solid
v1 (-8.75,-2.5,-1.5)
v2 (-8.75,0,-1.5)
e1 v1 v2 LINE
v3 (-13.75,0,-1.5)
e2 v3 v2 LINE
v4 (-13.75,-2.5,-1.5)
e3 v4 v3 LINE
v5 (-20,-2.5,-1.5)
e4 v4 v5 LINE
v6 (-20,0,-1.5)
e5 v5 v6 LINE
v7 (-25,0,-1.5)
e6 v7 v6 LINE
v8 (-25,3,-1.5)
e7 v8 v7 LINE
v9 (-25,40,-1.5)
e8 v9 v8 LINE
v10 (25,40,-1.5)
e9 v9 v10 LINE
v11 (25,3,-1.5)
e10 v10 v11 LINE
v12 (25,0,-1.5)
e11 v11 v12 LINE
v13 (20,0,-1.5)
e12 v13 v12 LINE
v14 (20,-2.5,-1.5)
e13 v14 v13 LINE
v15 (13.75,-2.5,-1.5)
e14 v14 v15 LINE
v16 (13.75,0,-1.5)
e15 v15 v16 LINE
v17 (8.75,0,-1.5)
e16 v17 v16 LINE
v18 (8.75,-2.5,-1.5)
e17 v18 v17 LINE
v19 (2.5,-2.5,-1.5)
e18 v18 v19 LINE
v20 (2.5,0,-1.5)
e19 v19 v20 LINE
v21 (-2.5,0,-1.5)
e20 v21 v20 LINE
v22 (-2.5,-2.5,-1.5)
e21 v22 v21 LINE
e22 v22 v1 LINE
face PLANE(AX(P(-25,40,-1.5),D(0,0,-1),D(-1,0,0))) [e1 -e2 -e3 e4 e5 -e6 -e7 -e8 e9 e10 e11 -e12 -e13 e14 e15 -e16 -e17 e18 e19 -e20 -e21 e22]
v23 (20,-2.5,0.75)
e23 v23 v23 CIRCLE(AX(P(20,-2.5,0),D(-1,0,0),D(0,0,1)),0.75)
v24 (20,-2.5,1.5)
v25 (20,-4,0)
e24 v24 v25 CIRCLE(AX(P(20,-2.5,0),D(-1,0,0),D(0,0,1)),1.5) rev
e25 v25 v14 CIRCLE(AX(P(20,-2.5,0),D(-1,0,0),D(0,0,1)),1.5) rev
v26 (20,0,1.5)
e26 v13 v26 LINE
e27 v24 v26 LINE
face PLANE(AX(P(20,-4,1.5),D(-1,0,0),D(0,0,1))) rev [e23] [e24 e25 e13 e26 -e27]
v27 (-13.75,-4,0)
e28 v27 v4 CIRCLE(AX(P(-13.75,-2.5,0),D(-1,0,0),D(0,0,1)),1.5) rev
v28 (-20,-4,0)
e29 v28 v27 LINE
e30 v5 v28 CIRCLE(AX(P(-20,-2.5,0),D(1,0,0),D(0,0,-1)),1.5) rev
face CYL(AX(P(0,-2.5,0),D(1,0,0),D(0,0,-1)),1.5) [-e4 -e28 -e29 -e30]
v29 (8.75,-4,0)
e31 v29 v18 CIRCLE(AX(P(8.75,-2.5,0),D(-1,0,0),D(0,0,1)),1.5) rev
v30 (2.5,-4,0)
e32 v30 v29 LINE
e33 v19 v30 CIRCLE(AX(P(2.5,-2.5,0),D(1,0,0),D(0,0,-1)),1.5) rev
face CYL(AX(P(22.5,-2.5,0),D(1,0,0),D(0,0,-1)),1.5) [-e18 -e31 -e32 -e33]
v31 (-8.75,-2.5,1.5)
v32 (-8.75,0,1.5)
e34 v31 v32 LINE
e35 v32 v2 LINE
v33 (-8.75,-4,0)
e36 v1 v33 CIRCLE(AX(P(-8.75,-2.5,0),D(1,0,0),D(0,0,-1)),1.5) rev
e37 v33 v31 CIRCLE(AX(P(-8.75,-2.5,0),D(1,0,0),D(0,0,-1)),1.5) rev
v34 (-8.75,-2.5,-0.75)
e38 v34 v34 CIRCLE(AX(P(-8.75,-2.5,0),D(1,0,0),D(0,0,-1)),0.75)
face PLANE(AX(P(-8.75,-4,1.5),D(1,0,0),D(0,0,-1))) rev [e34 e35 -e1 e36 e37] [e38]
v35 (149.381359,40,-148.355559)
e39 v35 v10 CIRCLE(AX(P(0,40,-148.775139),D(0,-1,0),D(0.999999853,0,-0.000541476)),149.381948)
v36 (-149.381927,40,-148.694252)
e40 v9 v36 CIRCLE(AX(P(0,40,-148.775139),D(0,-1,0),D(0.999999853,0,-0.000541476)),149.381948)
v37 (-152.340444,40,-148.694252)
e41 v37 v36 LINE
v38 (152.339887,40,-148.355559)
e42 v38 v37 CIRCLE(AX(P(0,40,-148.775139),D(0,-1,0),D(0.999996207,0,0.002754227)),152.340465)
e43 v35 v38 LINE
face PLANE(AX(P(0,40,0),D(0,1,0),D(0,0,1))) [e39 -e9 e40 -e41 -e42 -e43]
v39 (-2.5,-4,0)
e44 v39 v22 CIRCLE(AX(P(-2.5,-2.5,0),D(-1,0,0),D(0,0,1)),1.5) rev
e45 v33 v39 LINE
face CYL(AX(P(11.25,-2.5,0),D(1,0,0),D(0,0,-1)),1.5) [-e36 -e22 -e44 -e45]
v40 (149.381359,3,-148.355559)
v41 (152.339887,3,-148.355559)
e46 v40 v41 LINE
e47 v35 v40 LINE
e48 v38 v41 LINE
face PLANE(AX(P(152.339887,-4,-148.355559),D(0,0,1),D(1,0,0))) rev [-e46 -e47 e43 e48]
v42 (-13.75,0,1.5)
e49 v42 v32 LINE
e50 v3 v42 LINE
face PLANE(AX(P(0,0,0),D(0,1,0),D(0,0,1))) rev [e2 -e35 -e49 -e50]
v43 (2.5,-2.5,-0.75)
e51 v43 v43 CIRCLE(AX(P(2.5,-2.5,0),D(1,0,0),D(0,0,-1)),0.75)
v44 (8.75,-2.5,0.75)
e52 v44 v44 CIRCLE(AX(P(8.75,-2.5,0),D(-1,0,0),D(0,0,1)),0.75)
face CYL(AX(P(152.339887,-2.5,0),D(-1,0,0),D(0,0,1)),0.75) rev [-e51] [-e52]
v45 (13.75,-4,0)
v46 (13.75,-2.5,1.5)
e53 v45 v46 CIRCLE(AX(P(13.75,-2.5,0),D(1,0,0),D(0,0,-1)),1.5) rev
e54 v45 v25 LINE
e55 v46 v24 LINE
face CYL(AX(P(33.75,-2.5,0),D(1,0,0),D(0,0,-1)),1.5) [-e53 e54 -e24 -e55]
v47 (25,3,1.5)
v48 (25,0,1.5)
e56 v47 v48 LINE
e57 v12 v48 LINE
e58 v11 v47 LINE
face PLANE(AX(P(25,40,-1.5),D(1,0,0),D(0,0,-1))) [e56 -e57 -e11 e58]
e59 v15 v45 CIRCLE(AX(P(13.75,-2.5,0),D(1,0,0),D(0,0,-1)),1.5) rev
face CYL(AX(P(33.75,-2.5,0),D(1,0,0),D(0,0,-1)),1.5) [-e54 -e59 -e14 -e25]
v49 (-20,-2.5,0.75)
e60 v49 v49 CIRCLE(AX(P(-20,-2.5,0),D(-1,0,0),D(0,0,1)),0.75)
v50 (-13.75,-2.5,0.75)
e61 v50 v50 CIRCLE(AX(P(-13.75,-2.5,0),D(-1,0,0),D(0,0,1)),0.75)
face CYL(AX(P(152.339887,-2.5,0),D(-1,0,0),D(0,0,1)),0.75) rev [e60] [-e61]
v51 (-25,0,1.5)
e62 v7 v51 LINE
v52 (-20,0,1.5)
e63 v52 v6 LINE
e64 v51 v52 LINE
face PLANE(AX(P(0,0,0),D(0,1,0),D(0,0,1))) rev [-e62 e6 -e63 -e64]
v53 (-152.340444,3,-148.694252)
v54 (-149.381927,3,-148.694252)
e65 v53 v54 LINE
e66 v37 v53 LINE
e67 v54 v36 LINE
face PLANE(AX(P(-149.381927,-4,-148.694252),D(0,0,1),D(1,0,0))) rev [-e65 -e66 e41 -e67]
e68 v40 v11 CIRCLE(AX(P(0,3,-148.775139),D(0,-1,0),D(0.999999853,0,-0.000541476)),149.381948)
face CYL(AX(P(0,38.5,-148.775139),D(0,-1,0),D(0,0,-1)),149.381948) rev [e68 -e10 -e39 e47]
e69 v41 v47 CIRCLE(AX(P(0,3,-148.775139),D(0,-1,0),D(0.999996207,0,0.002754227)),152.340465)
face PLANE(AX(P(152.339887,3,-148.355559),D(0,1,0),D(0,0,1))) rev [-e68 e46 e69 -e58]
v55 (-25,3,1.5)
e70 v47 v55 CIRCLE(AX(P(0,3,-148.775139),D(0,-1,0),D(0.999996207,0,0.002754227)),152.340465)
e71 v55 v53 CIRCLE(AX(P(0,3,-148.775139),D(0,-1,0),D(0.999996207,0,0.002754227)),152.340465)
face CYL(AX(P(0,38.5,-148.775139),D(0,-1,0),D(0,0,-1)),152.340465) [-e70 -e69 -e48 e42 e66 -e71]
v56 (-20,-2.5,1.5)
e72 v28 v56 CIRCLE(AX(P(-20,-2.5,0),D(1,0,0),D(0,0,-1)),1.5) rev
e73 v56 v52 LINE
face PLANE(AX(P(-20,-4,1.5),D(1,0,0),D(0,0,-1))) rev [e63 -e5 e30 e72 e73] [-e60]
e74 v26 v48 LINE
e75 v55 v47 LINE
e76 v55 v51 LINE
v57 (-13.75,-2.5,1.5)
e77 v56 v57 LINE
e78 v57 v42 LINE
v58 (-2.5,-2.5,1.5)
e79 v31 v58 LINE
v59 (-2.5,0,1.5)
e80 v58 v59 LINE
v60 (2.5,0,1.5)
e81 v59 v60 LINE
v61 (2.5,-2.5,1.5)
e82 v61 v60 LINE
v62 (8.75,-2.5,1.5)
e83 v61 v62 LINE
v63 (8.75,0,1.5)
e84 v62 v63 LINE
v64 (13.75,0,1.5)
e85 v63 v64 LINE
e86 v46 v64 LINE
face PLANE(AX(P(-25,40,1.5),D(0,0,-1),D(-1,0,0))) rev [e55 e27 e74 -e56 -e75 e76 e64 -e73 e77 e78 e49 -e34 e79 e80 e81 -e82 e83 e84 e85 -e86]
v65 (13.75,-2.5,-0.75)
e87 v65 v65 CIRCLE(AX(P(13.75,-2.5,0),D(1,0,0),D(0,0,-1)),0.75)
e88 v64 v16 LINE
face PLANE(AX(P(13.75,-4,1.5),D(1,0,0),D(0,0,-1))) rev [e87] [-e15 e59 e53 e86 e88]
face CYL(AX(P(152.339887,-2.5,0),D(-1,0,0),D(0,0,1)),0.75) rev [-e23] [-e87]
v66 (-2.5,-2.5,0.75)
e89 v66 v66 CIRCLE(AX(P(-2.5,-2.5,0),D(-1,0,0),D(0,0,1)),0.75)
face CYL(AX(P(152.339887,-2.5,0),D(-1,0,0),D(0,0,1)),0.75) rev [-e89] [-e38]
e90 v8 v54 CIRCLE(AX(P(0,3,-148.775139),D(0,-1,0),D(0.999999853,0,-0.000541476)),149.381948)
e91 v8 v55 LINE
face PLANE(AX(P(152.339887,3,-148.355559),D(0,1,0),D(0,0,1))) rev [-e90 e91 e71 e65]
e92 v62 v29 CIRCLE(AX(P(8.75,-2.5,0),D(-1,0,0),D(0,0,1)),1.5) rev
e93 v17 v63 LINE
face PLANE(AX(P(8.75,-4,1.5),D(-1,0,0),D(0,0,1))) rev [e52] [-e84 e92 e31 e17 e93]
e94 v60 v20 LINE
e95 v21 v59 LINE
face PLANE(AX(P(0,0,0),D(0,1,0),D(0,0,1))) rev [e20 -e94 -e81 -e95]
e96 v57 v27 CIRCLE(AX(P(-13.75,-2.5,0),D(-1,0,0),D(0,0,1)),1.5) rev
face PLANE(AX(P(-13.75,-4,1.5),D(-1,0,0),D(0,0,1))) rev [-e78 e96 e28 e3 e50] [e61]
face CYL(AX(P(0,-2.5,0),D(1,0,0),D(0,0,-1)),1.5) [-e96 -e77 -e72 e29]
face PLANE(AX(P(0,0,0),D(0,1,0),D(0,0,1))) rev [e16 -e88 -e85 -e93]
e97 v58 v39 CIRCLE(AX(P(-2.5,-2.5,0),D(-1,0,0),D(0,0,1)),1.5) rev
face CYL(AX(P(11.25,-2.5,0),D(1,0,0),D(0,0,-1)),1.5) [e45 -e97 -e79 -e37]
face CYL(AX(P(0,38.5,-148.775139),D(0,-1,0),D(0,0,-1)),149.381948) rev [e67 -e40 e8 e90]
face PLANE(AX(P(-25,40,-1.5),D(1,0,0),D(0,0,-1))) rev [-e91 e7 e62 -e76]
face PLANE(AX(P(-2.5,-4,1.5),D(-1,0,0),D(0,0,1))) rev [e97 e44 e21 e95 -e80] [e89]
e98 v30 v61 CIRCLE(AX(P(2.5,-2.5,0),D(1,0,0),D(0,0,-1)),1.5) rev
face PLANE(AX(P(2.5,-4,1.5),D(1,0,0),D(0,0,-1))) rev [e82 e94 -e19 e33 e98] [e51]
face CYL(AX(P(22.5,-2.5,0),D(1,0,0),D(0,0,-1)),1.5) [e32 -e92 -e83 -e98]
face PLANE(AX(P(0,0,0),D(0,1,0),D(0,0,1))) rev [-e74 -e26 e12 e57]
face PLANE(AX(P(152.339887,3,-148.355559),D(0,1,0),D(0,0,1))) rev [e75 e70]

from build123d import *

# Parameters (mm, degrees)
SKETCH1_W              = 50
SKETCH1_H              = 3
BOSS_EXTRUDE1_DEPTH    = 40
SKETCH2_W              = 6.25
SKETCH2_H              = 3
BOSS_EXTRUDE2_DEPTH    = 4
FILLET1_R              = 1.5
LPATTERN1_COUNT        = 4
LPATTERN1_PITCH        = 11.25
FILLET1_OF_LPATTERN1_R = 1.5
SKETCH3_W              = 3
SKETCH3_H              = 37
SKETCH8_R              = 0.75
CUT_EXTRUDE1_DEPTH     = 232.430553417
CUT_EXTRUDE2_DEPTH     = 218.721568988


with BuildPart() as part:
    # Sketch1 → Boss-Extrude1 (new body)
    with BuildSketch(Plane(origin=(0, 0, 0), x_dir=(1, 0, 0), z_dir=(0, 1, 0))):
        Rectangle(SKETCH1_W, SKETCH1_H)
    extrude(amount=BOSS_EXTRUDE1_DEPTH)

    # Sketch2 → Boss-Extrude2 (add)
    with BuildSketch(Plane.XZ):
        with Locations((-16.875, 0)):
            Rectangle(SKETCH2_W, SKETCH2_H)
    boss_extrude2 = extrude(amount=BOSS_EXTRUDE2_DEPTH)

    # Fillet1
    fillet1_edges = [part.edges().sort_by_distance(p)[0] for p in [
        (-16.875, -4, 1.5),
        (-16.875, -4, -1.5),
    ]]
    fillet(fillet1_edges, radius=FILLET1_R - 0.0001)  # a hair under: the kernel refuses the full size

    # LPattern1: Boss-Extrude2 ×4
    with Locations(*[(i * LPATTERN1_PITCH, 0, 0) for i in range(1, LPATTERN1_COUNT)]):
        add(boss_extrude2)

    # Fillet1 of LPattern1
    fillet1_of_lpattern1_edges = [part.edges().sort_by_distance(p)[0] for p in [
        (-5.625, -4, 1.5),
        (-5.625, -4, -1.5),
        (5.625, -4, 1.5),
        (5.625, -4, -1.5),
        (16.875, -4, 1.5),
        (16.875, -4, -1.5),
    ]]
    fillet(fillet1_of_lpattern1_edges, radius=FILLET1_OF_LPATTERN1_R - 0.0001)  # a hair under: the kernel refuses the full size

    # Sweep2: sweep along a path in Sketch7
    with BuildLine(Plane(origin=(0, 38.5, 0), x_dir=(1, 0, 0), z_dir=(0, 1, 0))) as sweep2_path:
        ThreePointArc((-149.86, 148.775138892), (0, -1.084861108), (149.86, 148.775138892))
    # Sketch3 → Sweep2 (sweep)
    with BuildSketch(Plane(origin=(25, 0, 0), x_dir=(0, 0, -1), z_dir=(1, 0, 0))):
        with Locations((0, 21.5)):
            Rectangle(SKETCH3_W, SKETCH3_H)
    sweep(path=sweep2_path.line)

    # Sketch8 → Cut-Extrude1 (cut, through all)
    with BuildSketch(Plane.ZY.offset(20)):
        with Locations((0, -2.5)):
            Circle(SKETCH8_R)
    extrude(amount=-CUT_EXTRUDE1_DEPTH, mode=Mode.SUBTRACT)

    # Sketch9 → Cut-Extrude2 (cut, through all)
    with BuildSketch(Plane(origin=(0, 40, 0), x_dir=(1, 0, 0), z_dir=(0, 1, 0))):
        Polygon((-149.381926595, 148.694252085), (-152.34044383, 148.694252085), (-152.443464298, 148.694252085), (-152.443464298, 149.267987832), align=None)
        Polygon((152.339887493, 148.355558597), (149.339735724, 148.355558597), (149.381926595, 148.856025699), align=None)
    extrude(amount=-CUT_EXTRUDE2_DEPTH, mode=Mode.SUBTRACT)


solid = part.part
